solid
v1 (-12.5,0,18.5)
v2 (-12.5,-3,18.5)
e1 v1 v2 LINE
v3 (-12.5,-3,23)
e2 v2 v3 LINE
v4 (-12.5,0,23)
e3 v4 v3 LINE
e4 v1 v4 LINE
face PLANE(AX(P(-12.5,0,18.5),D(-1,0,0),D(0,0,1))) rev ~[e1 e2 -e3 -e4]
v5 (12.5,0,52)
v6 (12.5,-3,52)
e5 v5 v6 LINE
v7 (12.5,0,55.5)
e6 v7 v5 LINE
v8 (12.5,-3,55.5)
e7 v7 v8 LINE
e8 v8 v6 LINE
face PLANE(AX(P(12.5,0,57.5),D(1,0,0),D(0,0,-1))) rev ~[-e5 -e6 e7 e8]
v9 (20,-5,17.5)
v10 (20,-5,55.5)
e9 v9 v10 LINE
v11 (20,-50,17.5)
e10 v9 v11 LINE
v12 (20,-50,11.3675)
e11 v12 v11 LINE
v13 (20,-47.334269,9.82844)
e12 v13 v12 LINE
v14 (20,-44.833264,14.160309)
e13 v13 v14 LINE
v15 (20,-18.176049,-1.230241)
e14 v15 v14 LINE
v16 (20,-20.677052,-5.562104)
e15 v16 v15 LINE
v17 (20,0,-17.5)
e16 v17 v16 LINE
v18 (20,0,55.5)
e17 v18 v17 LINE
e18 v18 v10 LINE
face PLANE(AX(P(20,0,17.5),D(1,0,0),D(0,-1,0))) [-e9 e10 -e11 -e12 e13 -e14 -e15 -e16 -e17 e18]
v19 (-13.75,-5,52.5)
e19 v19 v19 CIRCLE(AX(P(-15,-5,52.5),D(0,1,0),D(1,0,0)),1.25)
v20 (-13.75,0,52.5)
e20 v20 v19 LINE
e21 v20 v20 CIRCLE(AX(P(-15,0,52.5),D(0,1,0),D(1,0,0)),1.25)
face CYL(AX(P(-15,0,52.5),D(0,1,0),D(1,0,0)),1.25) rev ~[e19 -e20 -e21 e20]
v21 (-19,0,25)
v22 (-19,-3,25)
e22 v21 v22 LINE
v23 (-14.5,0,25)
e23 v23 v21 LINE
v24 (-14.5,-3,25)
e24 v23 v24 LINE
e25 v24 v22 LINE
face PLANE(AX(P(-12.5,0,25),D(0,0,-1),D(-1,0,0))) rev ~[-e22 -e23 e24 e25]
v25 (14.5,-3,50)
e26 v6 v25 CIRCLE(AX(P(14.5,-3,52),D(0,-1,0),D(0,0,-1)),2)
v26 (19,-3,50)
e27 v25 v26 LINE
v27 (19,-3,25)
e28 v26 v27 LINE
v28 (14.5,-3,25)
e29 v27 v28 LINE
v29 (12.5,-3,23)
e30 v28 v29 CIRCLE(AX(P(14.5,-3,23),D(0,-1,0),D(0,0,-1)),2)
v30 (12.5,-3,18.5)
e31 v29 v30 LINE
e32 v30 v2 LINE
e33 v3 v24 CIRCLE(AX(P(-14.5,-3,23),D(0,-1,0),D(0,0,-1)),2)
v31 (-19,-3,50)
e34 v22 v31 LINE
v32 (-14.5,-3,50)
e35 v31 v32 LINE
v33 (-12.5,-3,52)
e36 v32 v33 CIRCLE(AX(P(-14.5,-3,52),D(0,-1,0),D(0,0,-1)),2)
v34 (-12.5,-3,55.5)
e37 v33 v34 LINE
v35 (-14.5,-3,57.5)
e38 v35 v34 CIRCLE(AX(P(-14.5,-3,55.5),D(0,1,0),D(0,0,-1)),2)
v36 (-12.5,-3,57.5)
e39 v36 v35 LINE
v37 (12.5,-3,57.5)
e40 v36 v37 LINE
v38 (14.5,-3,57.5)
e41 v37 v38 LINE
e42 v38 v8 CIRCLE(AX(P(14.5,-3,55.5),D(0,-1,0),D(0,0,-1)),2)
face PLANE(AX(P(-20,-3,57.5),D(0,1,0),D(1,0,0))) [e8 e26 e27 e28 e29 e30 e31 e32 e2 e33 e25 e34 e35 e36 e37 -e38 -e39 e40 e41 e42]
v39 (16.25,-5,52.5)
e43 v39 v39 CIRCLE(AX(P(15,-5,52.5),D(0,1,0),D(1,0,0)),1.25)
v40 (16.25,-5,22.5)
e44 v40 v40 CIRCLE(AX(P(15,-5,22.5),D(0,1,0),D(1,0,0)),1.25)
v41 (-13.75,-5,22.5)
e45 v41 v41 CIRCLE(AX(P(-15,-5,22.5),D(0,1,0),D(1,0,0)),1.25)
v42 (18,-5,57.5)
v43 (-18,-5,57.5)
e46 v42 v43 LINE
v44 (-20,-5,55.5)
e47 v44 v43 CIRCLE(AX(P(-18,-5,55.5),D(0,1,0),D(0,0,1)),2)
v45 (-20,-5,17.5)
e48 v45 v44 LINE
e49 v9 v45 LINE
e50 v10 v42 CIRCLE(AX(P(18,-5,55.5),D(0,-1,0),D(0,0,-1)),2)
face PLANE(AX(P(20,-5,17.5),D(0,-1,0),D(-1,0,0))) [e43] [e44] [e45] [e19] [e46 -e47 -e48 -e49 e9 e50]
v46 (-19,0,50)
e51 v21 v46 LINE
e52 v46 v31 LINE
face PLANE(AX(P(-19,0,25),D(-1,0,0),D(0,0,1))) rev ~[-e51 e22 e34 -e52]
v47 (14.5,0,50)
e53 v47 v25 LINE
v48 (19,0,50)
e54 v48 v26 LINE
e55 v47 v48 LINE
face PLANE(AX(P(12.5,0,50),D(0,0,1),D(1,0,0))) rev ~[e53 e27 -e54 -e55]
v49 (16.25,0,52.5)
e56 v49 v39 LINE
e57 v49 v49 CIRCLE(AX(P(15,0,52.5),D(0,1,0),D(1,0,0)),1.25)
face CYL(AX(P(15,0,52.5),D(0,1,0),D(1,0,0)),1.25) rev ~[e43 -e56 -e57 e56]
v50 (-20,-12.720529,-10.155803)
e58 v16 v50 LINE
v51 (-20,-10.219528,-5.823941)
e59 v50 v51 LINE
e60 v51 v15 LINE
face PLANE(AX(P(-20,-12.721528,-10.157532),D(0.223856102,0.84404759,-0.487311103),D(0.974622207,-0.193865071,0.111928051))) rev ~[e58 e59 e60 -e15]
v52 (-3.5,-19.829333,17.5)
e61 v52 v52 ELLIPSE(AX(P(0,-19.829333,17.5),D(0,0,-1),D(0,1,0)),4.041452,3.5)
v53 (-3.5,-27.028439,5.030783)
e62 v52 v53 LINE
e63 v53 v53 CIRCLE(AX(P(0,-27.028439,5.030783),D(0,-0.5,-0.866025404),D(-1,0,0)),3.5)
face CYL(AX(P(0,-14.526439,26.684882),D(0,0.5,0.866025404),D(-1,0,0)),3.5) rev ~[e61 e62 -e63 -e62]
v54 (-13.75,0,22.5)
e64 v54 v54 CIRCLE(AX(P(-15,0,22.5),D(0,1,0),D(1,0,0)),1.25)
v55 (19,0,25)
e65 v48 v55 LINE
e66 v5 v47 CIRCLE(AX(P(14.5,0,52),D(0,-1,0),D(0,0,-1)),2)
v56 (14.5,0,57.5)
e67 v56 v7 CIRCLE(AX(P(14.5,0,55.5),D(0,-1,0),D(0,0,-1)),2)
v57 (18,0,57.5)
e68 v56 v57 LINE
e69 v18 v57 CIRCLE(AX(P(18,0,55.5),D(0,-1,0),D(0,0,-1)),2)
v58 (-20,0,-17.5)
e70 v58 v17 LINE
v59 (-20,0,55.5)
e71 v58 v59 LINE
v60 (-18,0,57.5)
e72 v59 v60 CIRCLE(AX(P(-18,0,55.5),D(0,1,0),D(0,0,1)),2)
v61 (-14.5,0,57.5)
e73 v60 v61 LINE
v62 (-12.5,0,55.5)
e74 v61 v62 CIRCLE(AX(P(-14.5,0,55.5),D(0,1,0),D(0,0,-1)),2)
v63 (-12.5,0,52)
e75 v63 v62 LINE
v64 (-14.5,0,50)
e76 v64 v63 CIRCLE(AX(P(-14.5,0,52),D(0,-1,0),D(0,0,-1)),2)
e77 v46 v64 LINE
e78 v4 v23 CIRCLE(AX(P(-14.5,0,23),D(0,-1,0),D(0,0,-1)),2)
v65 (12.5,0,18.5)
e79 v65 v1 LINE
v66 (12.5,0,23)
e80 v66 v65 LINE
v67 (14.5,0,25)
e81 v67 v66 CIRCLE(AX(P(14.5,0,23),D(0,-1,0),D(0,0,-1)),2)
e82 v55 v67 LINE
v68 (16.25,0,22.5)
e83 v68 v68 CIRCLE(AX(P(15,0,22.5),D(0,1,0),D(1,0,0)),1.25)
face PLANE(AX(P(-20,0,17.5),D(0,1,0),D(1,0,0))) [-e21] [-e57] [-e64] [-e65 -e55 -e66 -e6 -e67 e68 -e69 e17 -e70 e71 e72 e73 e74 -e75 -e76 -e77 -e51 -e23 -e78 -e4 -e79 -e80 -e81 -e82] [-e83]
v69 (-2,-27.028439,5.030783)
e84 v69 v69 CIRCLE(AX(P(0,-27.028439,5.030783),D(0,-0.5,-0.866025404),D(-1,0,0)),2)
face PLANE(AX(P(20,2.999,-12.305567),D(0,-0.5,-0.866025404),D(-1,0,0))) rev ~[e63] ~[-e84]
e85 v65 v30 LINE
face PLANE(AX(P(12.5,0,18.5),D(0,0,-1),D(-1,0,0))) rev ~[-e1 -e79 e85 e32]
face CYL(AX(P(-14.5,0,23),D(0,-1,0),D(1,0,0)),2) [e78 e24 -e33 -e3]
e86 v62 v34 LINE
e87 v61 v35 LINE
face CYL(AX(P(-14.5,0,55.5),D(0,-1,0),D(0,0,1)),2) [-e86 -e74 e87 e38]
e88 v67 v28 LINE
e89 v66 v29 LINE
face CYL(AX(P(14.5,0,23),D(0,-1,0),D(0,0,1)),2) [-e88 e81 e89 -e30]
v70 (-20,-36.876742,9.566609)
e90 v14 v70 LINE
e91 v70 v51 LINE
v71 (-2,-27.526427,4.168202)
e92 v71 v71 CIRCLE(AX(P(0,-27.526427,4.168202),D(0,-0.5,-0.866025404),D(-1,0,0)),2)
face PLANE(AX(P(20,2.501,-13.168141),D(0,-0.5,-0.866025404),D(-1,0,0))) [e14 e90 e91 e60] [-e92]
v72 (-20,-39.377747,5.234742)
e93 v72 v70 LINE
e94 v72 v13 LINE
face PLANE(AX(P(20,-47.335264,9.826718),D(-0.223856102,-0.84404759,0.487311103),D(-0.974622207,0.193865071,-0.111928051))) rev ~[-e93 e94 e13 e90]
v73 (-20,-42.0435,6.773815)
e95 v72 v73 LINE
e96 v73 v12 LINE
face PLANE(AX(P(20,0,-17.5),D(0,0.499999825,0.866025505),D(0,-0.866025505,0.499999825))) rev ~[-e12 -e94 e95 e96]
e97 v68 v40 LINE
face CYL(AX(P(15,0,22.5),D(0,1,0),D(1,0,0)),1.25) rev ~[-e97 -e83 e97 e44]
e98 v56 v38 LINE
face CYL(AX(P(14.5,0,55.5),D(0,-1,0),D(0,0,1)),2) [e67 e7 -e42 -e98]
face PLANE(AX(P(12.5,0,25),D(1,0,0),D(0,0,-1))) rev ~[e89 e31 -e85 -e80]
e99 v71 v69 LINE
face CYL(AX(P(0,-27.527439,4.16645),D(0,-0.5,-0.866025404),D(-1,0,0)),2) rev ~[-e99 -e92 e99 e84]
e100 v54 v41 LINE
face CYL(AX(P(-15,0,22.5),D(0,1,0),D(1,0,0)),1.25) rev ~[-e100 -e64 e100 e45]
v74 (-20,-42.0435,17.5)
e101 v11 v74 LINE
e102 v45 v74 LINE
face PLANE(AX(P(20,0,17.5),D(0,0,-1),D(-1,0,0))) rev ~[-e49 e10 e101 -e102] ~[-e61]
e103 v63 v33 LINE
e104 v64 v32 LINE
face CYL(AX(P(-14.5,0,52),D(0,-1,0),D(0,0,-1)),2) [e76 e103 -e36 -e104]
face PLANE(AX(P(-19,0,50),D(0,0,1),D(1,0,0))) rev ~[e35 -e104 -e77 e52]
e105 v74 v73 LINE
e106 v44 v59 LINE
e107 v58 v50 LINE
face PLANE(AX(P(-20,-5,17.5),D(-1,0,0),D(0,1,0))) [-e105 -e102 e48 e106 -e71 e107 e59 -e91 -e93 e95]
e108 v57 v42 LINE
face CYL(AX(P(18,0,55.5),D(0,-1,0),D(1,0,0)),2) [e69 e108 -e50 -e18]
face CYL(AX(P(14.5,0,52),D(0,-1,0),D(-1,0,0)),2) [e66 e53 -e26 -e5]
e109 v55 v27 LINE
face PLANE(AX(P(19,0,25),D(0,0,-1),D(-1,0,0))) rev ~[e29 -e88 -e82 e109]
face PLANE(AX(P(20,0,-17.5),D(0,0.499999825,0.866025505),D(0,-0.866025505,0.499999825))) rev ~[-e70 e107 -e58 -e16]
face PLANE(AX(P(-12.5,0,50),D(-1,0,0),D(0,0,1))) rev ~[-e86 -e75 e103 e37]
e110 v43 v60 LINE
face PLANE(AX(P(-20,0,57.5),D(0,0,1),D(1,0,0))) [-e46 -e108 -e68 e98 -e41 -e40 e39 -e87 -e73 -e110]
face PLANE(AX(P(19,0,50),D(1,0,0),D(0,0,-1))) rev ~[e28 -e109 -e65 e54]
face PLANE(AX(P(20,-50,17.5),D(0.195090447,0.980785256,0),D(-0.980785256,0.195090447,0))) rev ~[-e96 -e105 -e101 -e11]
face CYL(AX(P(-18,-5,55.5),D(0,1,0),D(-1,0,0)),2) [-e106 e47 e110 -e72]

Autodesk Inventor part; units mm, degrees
ref_plane "YZ Plane" through (0, 0, 0) normal (1, 0, 0) x (0, 1, 0)
ref_plane "XZ Plane" through (0, 0, 0) normal (0, 1, 0) x (-1, 0, 0)
sketch "Sketch1" plane through (0, 0, 0) normal (0, 1, 0) x (-1, 0, 0)
  line L0 (19, 19) -> (-19, 19) construction
  line L1 (-19, 19) -> (-19, -19) construction
  line L2 (-19, -19) -> (19, -19) construction
  line L3 (19, -19) -> (19, 19) construction
  line L4 (19, 19) -> (-19, -19) construction
  line L5 (-19, 19) -> (19, -19) construction
  circle A0 centre (15, -15) radius 1.25
  circle A1 centre (-15, -15) radius 1.25
  circle A2 centre (15, 15) radius 1.25
  circle A3 centre (-15, 15) radius 1.25
  line L6 (20, 20) -> (-20, 20)
  line L7 (-20, 20) -> (-20, -20)
  line L8 (-20, -20) -> (20, -20)
  line L9 (20, -20) -> (20, 20)
  line L10 (20, 20) -> (-20, -20) construction
  line L11 (-20, 20) -> (20, -20) construction
  point P0 (0, 0)
  dimension "d0" = 38
  dimension "d1" = 38
  dimension "d2" = 2.5
  dimension "d3" = 2.5
  dimension "d4" = 2.5
  dimension "d5" = 2.5
  dimension "d6" = 4
  dimension "d7" = 4
  dimension "d8" = 4
  dimension "d9" = 4
  dimension "d10" = 40
  dimension "d11" = 40
extrude "Extrusion1" add sketch "Sketch1" along normal blind 5
sketch "Sketch2" plane through (0, 5, 0) normal (0, 1, 0) x (1, 0, 0)
  line L0 (-12.5, 19) -> (-12.5, 12.5)
  line L1 (-12.5, 12.5) -> (-19, 12.5)
  line L2 (-19, 12.5) -> (-19, -12.5)
  line L3 (-20, 20) -> (-20, -20) projected
  line L4 (-19, -12.5) -> (-12.5, -12.5)
  line L5 (-12.5, -12.5) -> (-12.5, -20)
  line L6 (-12.5, -20) -> (12.5, -20)
  line L7 (12.5, -20) -> (12.5, -12.5)
  line L8 (12.5, -12.5) -> (19, -12.5)
  line L9 (19, -12.5) -> (19, 12.5)
  line L10 (19, 12.5) -> (12.5, 12.5)
  line L11 (12.5, 12.5) -> (12.5, 19)
  line L12 (12.5, 19) -> (-12.5, 19)
  point P0 (0, 0)
  dimension "d14" = 25
  dimension "d15" = 6.5
  dimension "d16" = 25
  dimension "d17" = 7.5
  dimension "d18" = 6.5
  dimension "d19" = 6.5
  dimension "d20" = 25
  dimension "d21" = 6.5
  dimension "d22" = 12.5
  dimension "d24" = 12.5
extrude "Extrusion2" cut sketch "Sketch2" against normal blind 3
sketch "Sketch3" plane through (0, 2, 0) normal (0, 1, 0) x (1, 0, 0)
  line L0 (12.5, -12.5) -> (12.5, -20) projected
  line L1 (-12.5, -20) -> (12.5, -20)
  line L2 (12.5, -20) -> (12.5, -16)
  line L3 (12.5, -16) -> (-12.5, -16)
  line L4 (-12.5, -16) -> (-12.5, -20)
  point P0 (0, 0)
  dimension "d27" = 4
extrude "Extrusion3" cut sketch "Sketch3" against normal through all
fillet "Fillet1" radius 2 10 edges at (-20, 2.5, -20) (20, 2.5, -20) (-20, 2.5, 20) (20, 2.5, 20) (-12.5, 3.5, -12.5) (12.5, 3.5, -12.5) (12.5, 3.5, 12.5) (-12.5, 3.5, 12.5) (-12.5, 2.5, 20) (12.5, 2.5, 20)
sketch "Sketch4" plane through (0, 0, 0) normal (0, -1, 0) x (1, 0, 0)
  line L0 (-20, -17.5) -> (20, -17.5)
  line L1 (20, -17.5) -> (20, 17.5)
  line L2 (20, 17.5) -> (-20, 17.5)
  line L3 (-20, 17.5) -> (-20, -17.5)
  line L4 (-20, -17.5) -> (20, 17.5) construction
  line L5 (20, -17.5) -> (-20, 17.5) construction
  point P0 (0, 0)
  dimension "d31" = 40
  dimension "d32" = 35
extrude "Extrusion4" add sketch "Sketch4" along normal blind 50
sketch "Sketch6" plane through (-20, 0, 17.5) normal (0, 0, 1) x (1, 0, 0)
  line L0 (40, 0) -> (40, -50) projected
  line L1 (40, -50) -> (0, -42.0435)
  line L2 (0, 0) -> (0, -50) projected
  line L3 (40, -50) -> (80.7836, -50) construction
  line L4 (0, -42.0435) -> (0, -50)
  line L5 (0, -50) -> (40, -50)
  point P0 (20, 0)
  dimension "d35" = 168.75
extrude "Extrusion5" cut sketch "Sketch6" against normal through all
sketch "Sketch7" plane through (20, 0, 17.5) normal (1, 0, 0) x (0, 0, 1)
  line L0 (-35, 0) -> (-35, 50) projected
  line L1 (-35, 0) -> (-6.1325, 50)
  line L2 (-35, 50) -> (0, 50) projected
  line L3 (-35, 0) -> (22.735, 0) construction
  line L4 (-6.1325, 50) -> (-35, 50)
  line L5 (-35, 50) -> (-35, 0)
  point P0 (-17.5, 0)
  dimension "d38" = 120
extrude "Extrusion6" cut sketch "Sketch7" against normal through all
sketch "Sketch17" plane through (20, 0, -17.5) normal (0, -0.5, -0.8660254) x (-1, 0, 0)
  line L0 (40, -48.5477) -> (0, -57.735) construction
  line L1 (40, 0) -> (40, -48.5477) construction
  line L2 (0, 0) -> (40, 0) construction
  line L3 (0, -57.735) -> (0, 0) construction
  line L4 (0, -54.6569) -> (40, -45.4695) construction
  line L5 (0, -23.8758) -> (40, -14.6884) construction
  line L6 (0, -54.6569) -> (40, -45.4695)
  line L7 (40, -14.6884) -> (0, -23.8758)
  line L8 (0, -23.8758) -> (0, -54.6569)
  line L9 (40, -45.4695) -> (40, -14.6884)
  point P0 (20, -8.75)
  dimension "d60" = 30
  dimension "d61" = 3
extrude "Extrusion9" cut sketch "Sketch17" against normal blind 5
sketch "Sketch18" plane through (20, 2.5, -13.1699) normal (0, -0.5, -0.8660254) x (-1, 0, 0)
  line L0 (40, -14.6884) -> (40, -45.4695) construction
  line L1 (0, -23.8758) -> (40, -14.6884) construction
  line L2 (0, -54.6569) -> (0, -23.8758) construction
  line L3 (40, -45.4695) -> (0, -54.6569) construction
  line L4 (0, -54.6569) -> (40, -14.6884) construction
  line L5 (0, -23.8758) -> (40, -45.4695) construction
  circle A0 centre (20, -34.6727) radius 2
  circle A1 centre (20, -34.6727) radius 4.6064
  point P0 (20, -8.75)
  dimension "d64" = 4
extrude "Extrusion11" cut sketch "Sketch18" against normal through all contours A0
ref_plane "Work Plane3" through (20, 15.5, 9.3468) normal (0, -0.5, -0.8660254) x (-1, 0, 0)
sketch "Sketch20" plane through (20, 15.5, 9.3468) normal (0, -0.5, -0.8660254) x (-1, 0, 0)
  circle A0 centre (20, -34.6727) radius 2 projected
  circle A1 centre (20, -34.6727) radius 3.5
  point P0 (20, -8.75)
  dimension "d70" = 7
extrude "Extrusion12" cut sketch "Sketch20" along normal blind 25
sketch "Sketch21" plane through (-20, 0, 17.5) normal (0, 0, 1) x (1, 0, 0)
  line L0 (0, 0) -> (40, 0)
  line L1 (40, 0) -> (40, -5)
  line L2 (40, -5) -> (0, -5)
  line L3 (0, -5) -> (0, 0)
  point P0 (20, 0)
  dimension "d73" = 5
extrude "Extrusion13" add sketch "Sketch21" along normal blind 40
sketch "Sketch22" plane through (20, 0, -18) normal (1, 0, 0) x (0, 0, -1)
  line L0 (2, 0) -> (0, 0) projected
  line L1 (-38, 5) -> (-36, 5) projected
  line L2 (2, 0) -> (-38, 0)
  line L3 (-38, 0) -> (-38, 5)
  line L4 (-38, 5) -> (2, 5)
  line L5 (2, 5) -> (2, 0)
  point P0 (-18, 0)
extrude "Extrusion14" cut sketch "Sketch22" against normal through all
sketch "Sketch23" plane through (-20, 0, 57.5) normal (0, 1, 0) x (1, 0, 0)
  line L0 (40, 0) -> (0, 0) construction
  line L1 (20, 0) -> (20, 20) construction
  line L2 (39, 39) -> (1, 39) construction
  line L3 (1, 39) -> (1, 1) construction
  line L4 (1, 1) -> (39, 1) construction
  line L5 (39, 1) -> (39, 39) construction
  line L6 (39, 39) -> (1, 1) construction
  line L7 (1, 39) -> (39, 1) construction
  circle A0 centre (35, 5) radius 1.25
  line L8 (20, 20) -> (1, 20) construction
  circle A1 centre (5, 5) radius 1.25
  circle A2 centre (35, 35) radius 1.25
  circle A3 centre (5, 35) radius 1.25
  point P0 (20, 57.5)
  dimension "d78" = 20
  dimension "d79" = 38
  dimension "d80" = 38
  dimension "d81" = 4
  dimension "d82" = 2.5
extrude "Extrusion15" cut sketch "Sketch23" against normal through all
sketch "Sketch24" plane through (-20, 0, 57.5) normal (0, 1, 0) x (1, 0, 0)
  line L0 (1, 7.5) -> (7.5, 7.5)
  line L1 (7.5, 7.5) -> (7.5, 0)
  line L2 (7.5, 0) -> (32.5, 0)
  line L3 (32.5, 0) -> (32.5, 7.5)
  line L4 (32.5, 7.5) -> (39, 7.5)
  line L5 (39, 7.5) -> (39, 32.5)
  line L6 (39, 32.5) -> (32.5, 32.5)
  line L7 (32.5, 32.5) -> (32.5, 39)
  line L8 (32.5, 39) -> (7.5, 39)
  line L9 (7.5, 39) -> (7.5, 32.5)
  line L10 (7.5, 32.5) -> (1, 32.5)
  line L11 (1, 32.5) -> (1, 7.5)
  line L12 (0, 0) -> (40, 0) construction
  line L13 (0, 75) -> (0, 0) projected
  point P0 (20, 57.5)
  point P1 (39, 20)
  point P2 (20, 39)
  dimension "d85" = 6.5
  dimension "d86" = 25
  dimension "d87" = 6.5
  dimension "d88" = 25
  dimension "d90" = 7.5
  dimension "d91" = 25
  dimension "d92" = 6.5
  dimension "d93" = 20
  dimension "d94" = 7.5
  dimension "d95" = 6.5
  dimension "d96" = 20
extrude "Extrusion16" cut sketch "Sketch24" against normal blind 3
fillet "Fillet2" radius 2 8 edges at (-12.5, -1.5, 50) (-12.5, -1.5, 25) (12.5, -1.5, 25) (12.5, -1.5, 50) (12.5, -1.5, 57.5) (-12.5, -1.5, 57.5) (20, -2.5, 57.5) (-20, -2.5, 57.5)
properties part number "CameraMountM12v2"
